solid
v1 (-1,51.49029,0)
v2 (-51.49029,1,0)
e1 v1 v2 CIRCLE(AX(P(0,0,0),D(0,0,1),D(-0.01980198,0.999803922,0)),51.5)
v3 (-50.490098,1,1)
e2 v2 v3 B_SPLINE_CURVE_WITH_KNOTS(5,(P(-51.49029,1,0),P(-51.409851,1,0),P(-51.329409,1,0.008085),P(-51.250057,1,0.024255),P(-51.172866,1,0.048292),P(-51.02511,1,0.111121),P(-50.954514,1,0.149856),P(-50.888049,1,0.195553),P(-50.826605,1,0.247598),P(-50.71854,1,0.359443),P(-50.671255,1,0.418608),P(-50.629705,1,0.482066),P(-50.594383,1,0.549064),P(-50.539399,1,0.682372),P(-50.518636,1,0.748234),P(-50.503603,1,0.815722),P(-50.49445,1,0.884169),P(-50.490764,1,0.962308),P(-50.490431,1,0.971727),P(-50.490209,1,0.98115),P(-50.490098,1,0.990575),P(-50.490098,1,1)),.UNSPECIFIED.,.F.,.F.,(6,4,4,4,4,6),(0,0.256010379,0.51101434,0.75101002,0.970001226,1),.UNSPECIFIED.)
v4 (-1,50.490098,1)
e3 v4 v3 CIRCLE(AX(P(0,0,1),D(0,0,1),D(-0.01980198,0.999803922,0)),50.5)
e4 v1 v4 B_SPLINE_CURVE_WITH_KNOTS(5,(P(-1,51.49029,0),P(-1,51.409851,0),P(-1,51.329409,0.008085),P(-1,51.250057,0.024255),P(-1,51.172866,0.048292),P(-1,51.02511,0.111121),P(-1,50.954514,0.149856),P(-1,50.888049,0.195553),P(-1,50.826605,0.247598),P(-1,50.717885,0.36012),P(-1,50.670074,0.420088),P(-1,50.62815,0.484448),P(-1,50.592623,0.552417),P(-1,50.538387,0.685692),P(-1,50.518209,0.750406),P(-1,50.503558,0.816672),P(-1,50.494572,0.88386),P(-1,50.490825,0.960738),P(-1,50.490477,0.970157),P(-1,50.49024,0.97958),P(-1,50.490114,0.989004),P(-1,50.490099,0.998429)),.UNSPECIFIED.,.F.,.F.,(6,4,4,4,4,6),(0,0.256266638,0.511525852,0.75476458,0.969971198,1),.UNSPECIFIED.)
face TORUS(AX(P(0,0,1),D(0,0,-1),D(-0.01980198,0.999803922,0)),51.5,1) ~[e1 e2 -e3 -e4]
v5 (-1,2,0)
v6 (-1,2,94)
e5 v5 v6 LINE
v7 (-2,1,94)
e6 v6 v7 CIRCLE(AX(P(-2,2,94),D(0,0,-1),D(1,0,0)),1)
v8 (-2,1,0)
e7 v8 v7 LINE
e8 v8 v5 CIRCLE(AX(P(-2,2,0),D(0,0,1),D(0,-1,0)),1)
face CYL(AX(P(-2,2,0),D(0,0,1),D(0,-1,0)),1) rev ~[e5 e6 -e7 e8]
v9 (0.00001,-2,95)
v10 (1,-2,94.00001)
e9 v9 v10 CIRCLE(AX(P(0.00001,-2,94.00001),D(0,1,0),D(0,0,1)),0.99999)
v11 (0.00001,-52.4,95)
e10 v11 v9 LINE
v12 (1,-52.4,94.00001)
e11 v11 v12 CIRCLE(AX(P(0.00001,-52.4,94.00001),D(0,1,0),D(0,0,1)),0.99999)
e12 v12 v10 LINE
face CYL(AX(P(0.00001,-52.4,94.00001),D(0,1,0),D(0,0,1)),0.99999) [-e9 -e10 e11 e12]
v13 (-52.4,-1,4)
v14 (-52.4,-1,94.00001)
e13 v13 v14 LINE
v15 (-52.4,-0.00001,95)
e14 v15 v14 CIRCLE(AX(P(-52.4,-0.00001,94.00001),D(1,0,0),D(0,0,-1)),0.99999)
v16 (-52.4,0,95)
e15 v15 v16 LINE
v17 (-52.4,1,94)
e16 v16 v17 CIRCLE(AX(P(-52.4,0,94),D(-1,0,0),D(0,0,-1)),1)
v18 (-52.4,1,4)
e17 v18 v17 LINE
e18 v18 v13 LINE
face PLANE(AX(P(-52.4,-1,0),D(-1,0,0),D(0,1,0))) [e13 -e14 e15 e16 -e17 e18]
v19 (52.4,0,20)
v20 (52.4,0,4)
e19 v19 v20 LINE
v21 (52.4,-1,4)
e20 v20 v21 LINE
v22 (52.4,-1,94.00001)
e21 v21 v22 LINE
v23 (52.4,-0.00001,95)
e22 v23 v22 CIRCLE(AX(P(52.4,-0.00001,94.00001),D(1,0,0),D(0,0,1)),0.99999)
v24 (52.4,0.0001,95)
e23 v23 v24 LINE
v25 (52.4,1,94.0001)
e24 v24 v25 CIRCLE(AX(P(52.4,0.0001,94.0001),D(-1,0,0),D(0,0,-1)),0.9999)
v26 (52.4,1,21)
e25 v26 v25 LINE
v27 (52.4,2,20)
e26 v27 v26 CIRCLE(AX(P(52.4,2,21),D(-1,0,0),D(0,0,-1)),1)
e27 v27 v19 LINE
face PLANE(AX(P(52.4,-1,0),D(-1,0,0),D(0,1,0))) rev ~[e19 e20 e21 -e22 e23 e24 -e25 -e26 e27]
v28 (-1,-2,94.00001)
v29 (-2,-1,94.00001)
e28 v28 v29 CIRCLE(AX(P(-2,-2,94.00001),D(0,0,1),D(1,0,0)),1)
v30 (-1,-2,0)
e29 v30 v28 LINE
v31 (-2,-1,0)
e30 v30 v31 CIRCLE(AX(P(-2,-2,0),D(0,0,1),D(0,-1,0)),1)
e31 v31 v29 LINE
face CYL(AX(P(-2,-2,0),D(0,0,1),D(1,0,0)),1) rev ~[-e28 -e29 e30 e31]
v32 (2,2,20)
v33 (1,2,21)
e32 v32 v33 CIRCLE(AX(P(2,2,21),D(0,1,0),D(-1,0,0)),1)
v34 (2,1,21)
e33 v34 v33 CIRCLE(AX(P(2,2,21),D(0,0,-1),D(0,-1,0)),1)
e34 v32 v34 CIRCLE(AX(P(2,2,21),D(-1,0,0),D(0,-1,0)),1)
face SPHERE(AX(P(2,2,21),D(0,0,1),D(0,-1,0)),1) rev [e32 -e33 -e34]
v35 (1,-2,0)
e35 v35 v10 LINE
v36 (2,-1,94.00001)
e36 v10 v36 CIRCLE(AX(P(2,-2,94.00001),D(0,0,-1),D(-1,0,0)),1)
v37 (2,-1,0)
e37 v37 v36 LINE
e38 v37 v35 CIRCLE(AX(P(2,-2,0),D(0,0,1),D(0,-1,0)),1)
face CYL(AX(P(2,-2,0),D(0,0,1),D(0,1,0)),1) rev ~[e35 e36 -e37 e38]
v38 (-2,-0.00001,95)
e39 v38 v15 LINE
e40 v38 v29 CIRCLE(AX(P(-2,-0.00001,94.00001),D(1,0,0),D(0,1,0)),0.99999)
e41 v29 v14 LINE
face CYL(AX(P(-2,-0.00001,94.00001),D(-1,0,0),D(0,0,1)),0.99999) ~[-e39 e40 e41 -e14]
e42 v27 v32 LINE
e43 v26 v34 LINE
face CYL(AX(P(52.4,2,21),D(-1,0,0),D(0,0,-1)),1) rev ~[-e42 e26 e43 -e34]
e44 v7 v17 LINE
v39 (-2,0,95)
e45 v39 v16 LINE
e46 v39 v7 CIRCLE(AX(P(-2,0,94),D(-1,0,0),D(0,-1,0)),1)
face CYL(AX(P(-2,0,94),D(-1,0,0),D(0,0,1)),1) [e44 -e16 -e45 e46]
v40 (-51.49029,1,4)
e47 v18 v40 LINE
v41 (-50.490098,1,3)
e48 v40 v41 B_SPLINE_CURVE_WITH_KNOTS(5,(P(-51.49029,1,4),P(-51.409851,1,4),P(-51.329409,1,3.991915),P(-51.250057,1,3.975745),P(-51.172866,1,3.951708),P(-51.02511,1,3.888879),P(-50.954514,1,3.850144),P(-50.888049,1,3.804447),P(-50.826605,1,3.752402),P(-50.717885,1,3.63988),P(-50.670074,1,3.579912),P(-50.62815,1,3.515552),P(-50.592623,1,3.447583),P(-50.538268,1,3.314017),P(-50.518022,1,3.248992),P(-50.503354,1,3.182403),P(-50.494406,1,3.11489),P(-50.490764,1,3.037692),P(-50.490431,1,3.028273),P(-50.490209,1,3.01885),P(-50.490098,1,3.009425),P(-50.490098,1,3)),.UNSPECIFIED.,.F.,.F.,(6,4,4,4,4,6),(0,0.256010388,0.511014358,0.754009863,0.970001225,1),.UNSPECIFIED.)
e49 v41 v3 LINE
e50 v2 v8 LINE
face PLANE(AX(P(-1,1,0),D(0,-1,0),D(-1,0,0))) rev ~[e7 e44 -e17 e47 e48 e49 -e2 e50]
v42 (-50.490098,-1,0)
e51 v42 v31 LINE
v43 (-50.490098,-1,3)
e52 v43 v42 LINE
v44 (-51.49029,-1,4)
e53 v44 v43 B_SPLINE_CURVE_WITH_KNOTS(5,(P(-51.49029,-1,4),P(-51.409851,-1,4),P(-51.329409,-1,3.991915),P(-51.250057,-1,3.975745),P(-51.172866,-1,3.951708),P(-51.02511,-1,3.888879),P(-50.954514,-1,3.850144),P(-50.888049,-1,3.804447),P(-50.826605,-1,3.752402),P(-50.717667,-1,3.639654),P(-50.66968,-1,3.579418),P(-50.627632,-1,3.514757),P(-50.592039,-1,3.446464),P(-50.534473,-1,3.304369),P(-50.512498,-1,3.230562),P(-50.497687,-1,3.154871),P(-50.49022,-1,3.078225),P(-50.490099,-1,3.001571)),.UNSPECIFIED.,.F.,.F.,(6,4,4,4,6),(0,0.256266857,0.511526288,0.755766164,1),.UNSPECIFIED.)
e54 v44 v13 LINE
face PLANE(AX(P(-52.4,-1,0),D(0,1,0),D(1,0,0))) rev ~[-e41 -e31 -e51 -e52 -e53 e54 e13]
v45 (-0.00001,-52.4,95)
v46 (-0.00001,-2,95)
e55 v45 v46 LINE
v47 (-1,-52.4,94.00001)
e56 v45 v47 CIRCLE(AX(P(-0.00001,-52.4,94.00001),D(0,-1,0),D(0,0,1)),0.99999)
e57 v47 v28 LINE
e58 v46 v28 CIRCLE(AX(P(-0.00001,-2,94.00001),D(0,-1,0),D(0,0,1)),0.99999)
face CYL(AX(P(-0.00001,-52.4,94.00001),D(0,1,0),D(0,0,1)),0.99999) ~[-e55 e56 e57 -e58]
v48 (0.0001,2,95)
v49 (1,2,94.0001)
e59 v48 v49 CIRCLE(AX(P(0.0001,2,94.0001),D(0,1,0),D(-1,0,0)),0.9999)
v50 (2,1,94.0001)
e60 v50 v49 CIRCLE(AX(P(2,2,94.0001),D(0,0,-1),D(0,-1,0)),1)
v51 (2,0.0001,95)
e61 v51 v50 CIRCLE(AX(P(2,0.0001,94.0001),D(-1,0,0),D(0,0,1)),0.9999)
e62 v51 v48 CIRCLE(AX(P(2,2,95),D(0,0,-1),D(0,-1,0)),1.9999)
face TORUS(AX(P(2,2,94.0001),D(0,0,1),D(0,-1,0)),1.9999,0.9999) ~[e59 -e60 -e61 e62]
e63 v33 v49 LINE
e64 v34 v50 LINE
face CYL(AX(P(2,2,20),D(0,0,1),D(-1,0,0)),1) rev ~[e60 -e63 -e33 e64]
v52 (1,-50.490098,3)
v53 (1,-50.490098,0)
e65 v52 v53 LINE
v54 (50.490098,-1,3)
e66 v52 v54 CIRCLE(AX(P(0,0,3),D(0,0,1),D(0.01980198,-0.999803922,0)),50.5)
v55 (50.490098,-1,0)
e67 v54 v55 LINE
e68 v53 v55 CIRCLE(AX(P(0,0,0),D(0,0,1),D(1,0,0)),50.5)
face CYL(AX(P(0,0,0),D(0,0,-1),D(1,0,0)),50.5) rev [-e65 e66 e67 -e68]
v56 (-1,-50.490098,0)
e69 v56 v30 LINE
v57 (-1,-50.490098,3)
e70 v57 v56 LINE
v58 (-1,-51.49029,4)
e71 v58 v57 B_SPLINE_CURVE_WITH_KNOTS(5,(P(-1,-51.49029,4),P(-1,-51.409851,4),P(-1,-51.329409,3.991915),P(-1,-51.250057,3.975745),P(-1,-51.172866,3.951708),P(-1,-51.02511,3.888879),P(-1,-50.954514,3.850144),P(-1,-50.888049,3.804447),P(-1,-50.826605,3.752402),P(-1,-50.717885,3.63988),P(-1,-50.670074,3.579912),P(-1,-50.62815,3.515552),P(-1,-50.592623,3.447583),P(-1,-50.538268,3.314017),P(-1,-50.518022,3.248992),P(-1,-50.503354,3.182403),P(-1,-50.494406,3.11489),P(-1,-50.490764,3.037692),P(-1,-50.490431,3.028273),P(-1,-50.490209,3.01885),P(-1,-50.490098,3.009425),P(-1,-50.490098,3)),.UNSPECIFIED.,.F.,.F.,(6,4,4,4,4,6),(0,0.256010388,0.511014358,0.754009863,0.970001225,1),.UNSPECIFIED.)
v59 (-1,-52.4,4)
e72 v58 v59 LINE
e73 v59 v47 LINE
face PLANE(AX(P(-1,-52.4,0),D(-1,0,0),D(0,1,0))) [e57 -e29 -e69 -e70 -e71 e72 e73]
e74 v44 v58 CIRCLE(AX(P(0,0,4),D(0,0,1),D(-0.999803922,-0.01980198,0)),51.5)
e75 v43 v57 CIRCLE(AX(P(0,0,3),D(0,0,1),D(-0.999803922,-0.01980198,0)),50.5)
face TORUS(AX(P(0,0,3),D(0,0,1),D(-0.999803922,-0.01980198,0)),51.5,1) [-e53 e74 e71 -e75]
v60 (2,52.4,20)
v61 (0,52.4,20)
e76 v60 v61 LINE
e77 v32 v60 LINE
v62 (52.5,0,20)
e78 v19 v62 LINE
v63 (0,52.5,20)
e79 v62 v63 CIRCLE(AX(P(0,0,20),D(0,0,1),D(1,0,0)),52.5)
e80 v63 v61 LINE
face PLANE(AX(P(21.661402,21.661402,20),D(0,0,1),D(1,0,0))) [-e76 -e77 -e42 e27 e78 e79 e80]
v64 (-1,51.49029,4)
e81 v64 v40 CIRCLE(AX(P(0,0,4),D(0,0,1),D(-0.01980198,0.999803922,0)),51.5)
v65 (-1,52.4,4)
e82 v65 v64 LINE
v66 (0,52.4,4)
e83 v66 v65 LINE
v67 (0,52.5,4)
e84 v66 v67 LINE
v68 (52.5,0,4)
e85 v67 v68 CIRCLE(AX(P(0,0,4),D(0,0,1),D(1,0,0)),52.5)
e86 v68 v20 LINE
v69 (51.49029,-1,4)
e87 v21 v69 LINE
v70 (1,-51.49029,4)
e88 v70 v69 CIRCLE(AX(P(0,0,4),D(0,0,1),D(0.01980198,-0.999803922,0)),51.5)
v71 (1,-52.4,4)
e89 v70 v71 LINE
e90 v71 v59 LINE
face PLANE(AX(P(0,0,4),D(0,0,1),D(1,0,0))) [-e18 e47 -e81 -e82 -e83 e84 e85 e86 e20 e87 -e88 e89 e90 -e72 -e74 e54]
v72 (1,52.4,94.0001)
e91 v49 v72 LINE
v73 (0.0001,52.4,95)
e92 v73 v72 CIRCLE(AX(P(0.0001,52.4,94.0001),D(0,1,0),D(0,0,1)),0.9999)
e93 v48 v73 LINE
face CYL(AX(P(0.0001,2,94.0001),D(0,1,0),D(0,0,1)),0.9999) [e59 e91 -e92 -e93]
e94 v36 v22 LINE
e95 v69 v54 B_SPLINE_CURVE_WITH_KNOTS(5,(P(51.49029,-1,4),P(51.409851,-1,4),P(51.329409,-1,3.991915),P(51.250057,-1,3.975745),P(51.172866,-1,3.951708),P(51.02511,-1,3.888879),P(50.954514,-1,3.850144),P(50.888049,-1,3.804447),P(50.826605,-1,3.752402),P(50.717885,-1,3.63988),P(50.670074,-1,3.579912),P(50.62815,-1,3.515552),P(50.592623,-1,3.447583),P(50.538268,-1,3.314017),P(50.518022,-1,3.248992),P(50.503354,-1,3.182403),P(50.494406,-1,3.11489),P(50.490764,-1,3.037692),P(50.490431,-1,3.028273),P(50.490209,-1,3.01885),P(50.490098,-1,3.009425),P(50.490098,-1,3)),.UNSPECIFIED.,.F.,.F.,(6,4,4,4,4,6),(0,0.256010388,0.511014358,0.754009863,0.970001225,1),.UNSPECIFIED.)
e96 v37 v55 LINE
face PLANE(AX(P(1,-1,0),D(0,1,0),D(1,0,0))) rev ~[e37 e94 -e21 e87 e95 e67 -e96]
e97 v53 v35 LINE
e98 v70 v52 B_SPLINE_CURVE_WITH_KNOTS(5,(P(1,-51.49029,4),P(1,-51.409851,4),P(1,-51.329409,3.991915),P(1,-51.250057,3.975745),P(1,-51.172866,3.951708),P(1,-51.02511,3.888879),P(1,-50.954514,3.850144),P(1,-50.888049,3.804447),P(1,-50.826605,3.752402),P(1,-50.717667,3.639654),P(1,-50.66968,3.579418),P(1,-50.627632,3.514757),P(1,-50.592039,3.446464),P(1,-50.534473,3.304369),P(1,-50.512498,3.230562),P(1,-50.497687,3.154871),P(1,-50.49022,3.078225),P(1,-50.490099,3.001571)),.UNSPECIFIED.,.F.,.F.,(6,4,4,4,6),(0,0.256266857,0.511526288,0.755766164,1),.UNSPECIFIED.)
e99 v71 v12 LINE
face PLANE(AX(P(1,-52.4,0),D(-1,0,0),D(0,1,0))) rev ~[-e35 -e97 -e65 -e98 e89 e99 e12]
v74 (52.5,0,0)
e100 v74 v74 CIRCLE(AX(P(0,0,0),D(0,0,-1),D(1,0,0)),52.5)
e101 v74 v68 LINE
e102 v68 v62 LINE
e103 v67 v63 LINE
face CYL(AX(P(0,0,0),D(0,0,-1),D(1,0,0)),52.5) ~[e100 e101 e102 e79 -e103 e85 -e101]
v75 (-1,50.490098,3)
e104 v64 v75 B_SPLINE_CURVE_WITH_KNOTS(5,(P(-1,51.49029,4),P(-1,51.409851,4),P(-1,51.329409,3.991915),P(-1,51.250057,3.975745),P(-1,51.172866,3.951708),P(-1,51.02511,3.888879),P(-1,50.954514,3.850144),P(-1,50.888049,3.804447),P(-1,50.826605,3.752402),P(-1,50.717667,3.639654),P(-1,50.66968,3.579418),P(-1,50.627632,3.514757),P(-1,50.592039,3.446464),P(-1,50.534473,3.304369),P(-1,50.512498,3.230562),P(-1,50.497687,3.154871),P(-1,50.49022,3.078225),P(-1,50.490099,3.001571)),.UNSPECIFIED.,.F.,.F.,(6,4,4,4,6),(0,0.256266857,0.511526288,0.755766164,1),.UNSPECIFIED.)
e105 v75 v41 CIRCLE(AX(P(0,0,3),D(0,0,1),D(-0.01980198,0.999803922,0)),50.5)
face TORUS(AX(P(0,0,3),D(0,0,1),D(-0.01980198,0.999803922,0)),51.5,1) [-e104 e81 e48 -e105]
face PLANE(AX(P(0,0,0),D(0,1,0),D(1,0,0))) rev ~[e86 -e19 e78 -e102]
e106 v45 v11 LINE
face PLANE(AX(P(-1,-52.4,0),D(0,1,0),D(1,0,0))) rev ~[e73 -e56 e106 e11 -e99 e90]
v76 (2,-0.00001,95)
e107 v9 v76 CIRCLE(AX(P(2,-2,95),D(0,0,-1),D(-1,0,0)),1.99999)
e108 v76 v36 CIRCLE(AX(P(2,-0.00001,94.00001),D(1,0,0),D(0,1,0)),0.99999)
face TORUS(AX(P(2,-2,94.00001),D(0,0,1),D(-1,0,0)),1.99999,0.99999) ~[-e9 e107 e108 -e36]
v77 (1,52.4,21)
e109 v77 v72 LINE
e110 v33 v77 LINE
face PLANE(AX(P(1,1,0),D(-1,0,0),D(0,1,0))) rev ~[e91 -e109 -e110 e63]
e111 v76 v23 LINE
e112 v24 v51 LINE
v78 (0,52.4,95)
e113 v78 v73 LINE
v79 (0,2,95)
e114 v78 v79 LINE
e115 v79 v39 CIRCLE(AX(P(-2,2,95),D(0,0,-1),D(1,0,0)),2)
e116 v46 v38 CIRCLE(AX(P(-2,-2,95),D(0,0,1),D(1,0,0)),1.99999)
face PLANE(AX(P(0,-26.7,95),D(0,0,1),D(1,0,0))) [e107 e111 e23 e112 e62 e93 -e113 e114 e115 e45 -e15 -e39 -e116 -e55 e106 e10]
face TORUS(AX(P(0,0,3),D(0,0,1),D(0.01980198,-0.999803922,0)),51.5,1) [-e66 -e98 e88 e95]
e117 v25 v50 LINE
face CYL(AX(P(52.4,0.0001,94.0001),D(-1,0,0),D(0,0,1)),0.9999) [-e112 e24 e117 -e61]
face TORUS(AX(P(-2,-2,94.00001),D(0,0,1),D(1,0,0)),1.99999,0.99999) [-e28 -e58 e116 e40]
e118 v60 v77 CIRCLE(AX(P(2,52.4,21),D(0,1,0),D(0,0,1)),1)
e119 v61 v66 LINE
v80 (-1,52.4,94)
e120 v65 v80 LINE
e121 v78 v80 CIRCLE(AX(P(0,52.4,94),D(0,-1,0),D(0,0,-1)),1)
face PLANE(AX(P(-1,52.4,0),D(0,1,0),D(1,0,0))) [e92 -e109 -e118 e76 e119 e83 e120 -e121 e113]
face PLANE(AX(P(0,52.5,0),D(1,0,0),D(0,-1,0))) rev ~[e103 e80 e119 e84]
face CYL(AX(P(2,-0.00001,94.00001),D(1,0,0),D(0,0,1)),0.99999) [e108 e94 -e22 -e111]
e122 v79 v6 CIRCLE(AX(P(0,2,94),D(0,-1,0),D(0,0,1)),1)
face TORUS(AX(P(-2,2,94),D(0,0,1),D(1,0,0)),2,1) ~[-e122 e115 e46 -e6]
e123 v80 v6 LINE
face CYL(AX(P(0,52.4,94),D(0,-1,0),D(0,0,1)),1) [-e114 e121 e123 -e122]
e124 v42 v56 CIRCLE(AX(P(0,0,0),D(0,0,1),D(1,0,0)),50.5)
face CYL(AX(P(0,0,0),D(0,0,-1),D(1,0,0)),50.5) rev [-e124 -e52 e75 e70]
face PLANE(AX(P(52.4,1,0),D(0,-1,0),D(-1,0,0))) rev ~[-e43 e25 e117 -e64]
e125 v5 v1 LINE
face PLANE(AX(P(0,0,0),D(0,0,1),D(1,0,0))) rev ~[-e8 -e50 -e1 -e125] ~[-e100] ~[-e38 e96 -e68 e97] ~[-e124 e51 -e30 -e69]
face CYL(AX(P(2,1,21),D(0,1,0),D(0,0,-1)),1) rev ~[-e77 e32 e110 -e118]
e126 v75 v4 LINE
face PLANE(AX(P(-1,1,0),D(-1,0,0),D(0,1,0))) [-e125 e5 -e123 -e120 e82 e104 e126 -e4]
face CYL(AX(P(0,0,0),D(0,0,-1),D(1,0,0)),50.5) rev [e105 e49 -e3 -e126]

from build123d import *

# Parameters (mm, degrees)
F0_R     = 52.5
F0_R_2   = 50.5
F1_DEPTH = 4
F2_W     = 2
F2_H     = 51.4
F2_W_2   = 51.4
F2_H_2   = 2
F3_DEPTH = 95
F5_DEPTH = 20
F6_F1_R  = 1
F6_F2_R  = 1
F6_F3_R  = 0.9999
F7_R     = 0.99999


# Not quite as in the source:
# - a fillet or chamfer is up to 0.001 mm smaller than in the source, because OpenCascade refuses the exact size


with BuildPart() as f1:
    # F0 (on Top) → F1 (new body)
    with BuildSketch(Plane.XY):
        Circle(F0_R)
        Circle(F0_R_2, mode=Mode.SUBTRACT)
    extrude(amount=F1_DEPTH)

    # F2 (on Top) → F3 (join)
    with BuildSketch(Plane.XY):
        with Locations((0, -26.7)):
            Rectangle(F2_W, F2_H)
        with Locations((-26.7, 0)):
            Rectangle(F2_W_2, F2_H_2)
        Rectangle(F2_W, F2_H_2)
        with Locations((26.7, 0)):
            Rectangle(F2_W_2, F2_H_2)
        with Locations((0, 26.7)):
            Rectangle(F2_W, F2_H)
    extrude(amount=F3_DEPTH)

    # F4 (on Top) → F5 (join)
    with BuildSketch(Plane.XY):
        with BuildLine():
            Line((0, 0), (52.5, 0))
            ThreePointArc((52.5, 0), (37.1231060123, 37.1231060123), (0, 52.5))
            Line((0, 52.5), (0, 0))
        make_face()
    extrude(amount=F5_DEPTH)

    # F6: fillet of radius 1 on 13 edges, made by hand

    # F6_f1
    f6_f1_edges = [f1.edges().sort_by_distance(p)[0] for p in [
        (1, 1, 57.5),
        (26.7, 1, 20),
        (1, 26.7, 20),
        (-1, 1, 47.5),
        (1, -1, 47.5),
        (-1, -1, 47.5),
    ]]
    fillet(f6_f1_edges, radius=F6_F1_R)

    # F6_f2
    f6_f2_edges = [f1.edges().sort_by_distance(p)[0] for p in [
        (-27.2, 1, 95),
        (-35.7088924499, -35.7088924499, 4),
        (35.7088924499, -35.7088924499, 4),
        (-35.7088924499, 35.7088924499, 0),
        (-35.7088924499, 35.7088924499, 4),
        (-1.2928932188, 1.2928932188, 95),
    ]]
    fillet(f6_f2_edges, radius=F6_F2_R)

    # F6_f3 (radius 1 in the source; OpenCascade refuses exactly that, so slightly less here)
    f6_f3_edges = [f1.edges().sort_by_distance(p)[0] for p in [
        (1, 27.2, 95),
        (27.2, 1, 95),
        (1.2928932188, 1.2928932188, 95),
    ]]
    fillet(f6_f3_edges, radius=F6_F3_R)

    # F7 (radius 1 in the source; OpenCascade refuses exactly that, so slightly less here)
    f7_edges = [f1.edges().sort_by_distance(p)[0] for p in [
        (1, -27.2, 95),
        (-1, -27.2, 95),
        (-27.2, -1, 95),
        (27.2, -1, 95),
        (1.292893, -1.292893, 95),
        (-1.292893, -1.292893, 95),
    ]]
    fillet(f7_edges, radius=F7_R)


solid = f1.part
